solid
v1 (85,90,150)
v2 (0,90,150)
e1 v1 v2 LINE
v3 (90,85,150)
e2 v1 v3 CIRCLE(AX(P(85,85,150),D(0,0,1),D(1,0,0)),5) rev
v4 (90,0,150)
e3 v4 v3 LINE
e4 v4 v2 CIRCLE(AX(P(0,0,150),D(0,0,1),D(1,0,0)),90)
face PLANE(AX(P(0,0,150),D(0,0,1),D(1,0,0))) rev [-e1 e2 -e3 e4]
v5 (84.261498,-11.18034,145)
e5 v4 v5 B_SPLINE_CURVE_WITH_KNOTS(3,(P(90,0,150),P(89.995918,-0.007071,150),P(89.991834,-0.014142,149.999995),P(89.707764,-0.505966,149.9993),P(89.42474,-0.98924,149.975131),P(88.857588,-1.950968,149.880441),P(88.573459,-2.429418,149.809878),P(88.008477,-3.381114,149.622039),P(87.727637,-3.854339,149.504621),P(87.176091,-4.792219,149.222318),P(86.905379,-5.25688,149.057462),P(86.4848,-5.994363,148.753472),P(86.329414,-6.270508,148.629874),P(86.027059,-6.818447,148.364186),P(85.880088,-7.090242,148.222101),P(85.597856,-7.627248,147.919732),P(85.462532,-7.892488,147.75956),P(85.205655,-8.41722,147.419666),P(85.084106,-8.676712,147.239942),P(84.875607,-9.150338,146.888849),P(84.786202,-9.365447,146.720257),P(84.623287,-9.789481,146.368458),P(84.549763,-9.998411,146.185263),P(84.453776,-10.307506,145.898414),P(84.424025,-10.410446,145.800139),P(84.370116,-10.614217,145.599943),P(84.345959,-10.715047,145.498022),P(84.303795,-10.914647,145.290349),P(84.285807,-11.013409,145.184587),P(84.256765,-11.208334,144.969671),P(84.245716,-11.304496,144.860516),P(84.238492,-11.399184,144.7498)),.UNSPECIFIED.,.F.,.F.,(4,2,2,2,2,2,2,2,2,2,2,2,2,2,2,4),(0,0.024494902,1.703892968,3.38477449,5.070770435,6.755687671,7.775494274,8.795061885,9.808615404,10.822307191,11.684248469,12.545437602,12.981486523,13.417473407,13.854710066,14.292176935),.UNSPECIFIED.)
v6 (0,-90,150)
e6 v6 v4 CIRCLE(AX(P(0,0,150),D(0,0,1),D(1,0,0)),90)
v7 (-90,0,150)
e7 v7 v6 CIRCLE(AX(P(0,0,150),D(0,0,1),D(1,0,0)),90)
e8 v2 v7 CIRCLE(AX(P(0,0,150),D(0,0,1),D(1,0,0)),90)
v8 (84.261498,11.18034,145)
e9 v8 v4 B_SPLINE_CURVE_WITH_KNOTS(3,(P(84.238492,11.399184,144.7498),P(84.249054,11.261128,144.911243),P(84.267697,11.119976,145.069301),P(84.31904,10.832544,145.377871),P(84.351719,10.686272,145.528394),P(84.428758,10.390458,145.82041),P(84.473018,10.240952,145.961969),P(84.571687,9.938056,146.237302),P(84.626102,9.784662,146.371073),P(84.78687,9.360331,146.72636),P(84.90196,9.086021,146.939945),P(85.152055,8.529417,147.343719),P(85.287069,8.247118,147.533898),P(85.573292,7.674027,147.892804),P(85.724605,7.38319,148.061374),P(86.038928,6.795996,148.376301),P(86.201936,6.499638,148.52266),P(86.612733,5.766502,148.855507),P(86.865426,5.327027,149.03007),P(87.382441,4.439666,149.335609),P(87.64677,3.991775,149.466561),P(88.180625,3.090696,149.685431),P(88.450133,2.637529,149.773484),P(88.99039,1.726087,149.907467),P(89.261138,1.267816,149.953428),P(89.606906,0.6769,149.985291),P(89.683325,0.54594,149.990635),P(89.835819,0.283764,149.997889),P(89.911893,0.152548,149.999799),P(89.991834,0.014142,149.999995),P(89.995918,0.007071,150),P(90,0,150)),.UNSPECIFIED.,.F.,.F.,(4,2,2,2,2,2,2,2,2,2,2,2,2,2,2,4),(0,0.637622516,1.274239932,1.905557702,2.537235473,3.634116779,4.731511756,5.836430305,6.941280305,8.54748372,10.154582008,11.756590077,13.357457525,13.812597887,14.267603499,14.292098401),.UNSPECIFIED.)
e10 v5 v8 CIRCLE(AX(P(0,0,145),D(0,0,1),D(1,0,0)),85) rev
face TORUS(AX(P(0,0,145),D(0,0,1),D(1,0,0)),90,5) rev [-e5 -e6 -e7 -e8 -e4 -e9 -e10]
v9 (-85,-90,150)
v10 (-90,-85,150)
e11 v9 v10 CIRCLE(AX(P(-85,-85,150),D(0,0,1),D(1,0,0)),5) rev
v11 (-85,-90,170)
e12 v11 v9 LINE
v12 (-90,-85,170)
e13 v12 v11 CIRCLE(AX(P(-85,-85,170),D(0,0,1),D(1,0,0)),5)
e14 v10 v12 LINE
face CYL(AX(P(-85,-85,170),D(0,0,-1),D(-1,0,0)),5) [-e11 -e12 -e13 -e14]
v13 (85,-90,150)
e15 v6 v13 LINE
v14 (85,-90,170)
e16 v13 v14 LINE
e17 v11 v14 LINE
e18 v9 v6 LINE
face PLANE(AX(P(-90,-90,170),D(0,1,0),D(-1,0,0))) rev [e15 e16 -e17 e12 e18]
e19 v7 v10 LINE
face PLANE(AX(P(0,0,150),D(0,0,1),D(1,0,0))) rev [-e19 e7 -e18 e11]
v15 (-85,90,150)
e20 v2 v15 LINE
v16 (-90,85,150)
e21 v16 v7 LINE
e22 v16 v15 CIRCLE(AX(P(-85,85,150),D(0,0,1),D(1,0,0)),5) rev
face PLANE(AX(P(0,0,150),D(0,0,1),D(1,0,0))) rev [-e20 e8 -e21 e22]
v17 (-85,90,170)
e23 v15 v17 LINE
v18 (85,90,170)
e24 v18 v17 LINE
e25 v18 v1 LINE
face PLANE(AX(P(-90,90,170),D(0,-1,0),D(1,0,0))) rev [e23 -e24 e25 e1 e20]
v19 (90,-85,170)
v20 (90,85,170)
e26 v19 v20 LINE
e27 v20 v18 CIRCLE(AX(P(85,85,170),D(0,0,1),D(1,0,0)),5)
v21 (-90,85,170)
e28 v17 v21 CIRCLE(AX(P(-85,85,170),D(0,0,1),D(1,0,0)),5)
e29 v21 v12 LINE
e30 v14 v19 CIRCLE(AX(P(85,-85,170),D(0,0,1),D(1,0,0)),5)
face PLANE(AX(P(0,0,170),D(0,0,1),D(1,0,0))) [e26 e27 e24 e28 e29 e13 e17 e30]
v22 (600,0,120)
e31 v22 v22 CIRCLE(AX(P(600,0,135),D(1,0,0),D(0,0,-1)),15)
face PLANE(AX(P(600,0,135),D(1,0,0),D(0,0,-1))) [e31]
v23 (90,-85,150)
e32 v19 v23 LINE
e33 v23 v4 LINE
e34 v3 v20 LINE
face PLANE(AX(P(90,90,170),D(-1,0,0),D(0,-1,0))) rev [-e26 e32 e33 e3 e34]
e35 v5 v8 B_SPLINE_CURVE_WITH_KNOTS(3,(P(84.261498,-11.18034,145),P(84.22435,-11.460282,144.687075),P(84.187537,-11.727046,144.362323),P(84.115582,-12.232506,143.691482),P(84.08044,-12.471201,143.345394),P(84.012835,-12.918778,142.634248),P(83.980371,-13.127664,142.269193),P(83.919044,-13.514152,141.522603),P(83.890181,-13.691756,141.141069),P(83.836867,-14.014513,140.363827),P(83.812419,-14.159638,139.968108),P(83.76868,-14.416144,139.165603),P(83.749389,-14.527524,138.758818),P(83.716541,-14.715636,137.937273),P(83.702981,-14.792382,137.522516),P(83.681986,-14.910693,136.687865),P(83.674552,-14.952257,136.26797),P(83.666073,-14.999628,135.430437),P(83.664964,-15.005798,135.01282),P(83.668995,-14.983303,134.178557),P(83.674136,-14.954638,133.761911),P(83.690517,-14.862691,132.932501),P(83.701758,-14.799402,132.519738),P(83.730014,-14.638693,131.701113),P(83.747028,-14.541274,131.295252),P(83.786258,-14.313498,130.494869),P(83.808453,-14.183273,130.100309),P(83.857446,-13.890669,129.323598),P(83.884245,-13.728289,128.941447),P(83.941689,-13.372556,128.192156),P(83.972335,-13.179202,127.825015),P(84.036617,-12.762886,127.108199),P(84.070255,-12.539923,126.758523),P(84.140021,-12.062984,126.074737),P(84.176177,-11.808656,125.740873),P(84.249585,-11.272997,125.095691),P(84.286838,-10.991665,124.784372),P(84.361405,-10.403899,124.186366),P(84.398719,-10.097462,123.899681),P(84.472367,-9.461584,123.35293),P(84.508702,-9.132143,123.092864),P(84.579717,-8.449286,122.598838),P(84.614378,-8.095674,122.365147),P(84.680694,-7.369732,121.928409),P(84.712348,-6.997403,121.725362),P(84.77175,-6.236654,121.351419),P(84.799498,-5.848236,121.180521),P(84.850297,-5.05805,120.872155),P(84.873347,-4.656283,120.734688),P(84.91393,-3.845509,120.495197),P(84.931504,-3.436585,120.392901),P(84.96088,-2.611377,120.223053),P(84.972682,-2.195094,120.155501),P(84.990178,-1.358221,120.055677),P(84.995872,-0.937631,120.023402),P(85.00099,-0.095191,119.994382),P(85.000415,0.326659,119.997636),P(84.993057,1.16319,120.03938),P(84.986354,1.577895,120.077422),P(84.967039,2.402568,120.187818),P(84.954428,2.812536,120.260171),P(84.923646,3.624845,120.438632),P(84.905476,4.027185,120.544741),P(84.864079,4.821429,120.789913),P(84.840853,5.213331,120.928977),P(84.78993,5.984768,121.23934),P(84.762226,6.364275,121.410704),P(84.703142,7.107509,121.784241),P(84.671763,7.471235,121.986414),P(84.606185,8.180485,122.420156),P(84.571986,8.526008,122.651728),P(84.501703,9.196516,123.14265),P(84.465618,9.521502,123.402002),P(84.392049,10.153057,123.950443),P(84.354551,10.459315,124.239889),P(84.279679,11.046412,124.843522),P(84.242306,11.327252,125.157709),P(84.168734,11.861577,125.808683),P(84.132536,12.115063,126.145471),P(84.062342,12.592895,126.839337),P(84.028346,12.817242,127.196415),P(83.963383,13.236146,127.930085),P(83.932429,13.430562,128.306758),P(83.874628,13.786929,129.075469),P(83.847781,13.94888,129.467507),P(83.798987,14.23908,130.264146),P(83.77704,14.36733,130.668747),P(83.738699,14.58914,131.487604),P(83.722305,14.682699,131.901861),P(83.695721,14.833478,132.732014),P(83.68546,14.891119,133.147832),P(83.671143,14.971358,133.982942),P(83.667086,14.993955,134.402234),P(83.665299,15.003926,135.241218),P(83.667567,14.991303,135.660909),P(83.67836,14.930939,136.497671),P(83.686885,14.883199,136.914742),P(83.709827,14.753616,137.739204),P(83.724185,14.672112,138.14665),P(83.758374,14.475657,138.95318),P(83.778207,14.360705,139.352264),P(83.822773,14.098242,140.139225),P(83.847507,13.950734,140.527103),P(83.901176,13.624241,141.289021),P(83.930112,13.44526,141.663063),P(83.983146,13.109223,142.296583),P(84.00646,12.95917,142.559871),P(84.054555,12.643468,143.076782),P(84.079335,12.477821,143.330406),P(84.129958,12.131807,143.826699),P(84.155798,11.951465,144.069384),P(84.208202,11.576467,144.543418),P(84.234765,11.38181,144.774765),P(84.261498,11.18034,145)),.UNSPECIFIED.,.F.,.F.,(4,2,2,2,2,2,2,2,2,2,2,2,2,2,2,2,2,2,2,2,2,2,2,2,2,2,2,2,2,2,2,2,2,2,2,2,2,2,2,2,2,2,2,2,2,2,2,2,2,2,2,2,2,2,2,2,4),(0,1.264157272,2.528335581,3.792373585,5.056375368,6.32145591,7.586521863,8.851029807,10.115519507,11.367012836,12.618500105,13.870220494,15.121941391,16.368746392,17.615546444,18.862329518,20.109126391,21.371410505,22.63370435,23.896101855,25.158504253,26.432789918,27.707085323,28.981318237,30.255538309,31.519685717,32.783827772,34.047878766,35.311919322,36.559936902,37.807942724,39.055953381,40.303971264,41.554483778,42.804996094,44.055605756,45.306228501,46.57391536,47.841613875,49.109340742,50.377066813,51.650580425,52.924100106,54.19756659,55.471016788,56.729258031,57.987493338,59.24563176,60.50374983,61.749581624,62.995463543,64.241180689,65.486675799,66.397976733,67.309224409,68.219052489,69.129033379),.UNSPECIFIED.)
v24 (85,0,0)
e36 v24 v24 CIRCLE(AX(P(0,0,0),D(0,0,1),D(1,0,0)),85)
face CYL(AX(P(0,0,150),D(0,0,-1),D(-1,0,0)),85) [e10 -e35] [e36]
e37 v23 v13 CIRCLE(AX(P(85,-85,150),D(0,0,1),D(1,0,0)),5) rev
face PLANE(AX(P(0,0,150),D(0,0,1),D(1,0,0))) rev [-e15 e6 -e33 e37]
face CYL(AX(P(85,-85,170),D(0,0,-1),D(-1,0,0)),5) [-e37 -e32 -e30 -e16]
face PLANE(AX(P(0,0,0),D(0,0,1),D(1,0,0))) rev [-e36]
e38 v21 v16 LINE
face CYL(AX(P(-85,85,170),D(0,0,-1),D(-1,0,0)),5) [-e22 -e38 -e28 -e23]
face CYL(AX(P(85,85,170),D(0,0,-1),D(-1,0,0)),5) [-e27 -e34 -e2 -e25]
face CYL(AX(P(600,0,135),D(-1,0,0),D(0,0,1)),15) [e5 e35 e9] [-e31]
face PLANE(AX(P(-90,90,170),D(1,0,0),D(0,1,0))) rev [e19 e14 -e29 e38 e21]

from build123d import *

# Parameters (mm, degrees)
ESQUISSE1_R        = 85
BOSS_EXTRU_1_DEPTH = 150
ESQUISSE2_W        = 180
ESQUISSE2_H        = 180
BOSS_EXTRU_2_DEPTH = 20
CONG_1_R           = 5
CONG_2_R           = 5
CONG_3_R           = 5
CONG_4_R           = 5
CONG_5_R           = 5
ESQUISSE4_R        = 15
BOSS_EXTRU_3_DEPTH = 600


with BuildPart() as part:
    # Esquisse1 → Boss.-Extru.1 (new body)
    with BuildSketch(Plane.XY):
        Circle(ESQUISSE1_R)
    extrude(amount=BOSS_EXTRU_1_DEPTH)

    # Esquisse2 → Boss.-Extru.2 (add)
    with BuildSketch(Plane.XY.offset(150)):
        Rectangle(ESQUISSE2_W, ESQUISSE2_H)
    extrude(amount=BOSS_EXTRU_2_DEPTH)

    # Congé1
    cong_1_edges = [part.edges().sort_by_distance(p)[0] for p in [
        (-85, 0, 150),
    ]]
    fillet(cong_1_edges, radius=CONG_1_R - 0.0001)  # a hair under: the kernel refuses the full size

    # Congé2
    cong_2_edges = [part.edges().sort_by_distance(p)[0] for p in [
        (-90, 90, 160),
    ]]
    fillet(cong_2_edges, radius=CONG_2_R)

    # Congé3
    cong_3_edges = [part.edges().sort_by_distance(p)[0] for p in [
        (-90, -90, 160),
    ]]
    fillet(cong_3_edges, radius=CONG_3_R)

    # Congé4
    cong_4_edges = [part.edges().sort_by_distance(p)[0] for p in [
        (90, 90, 160),
    ]]
    fillet(cong_4_edges, radius=CONG_4_R)

    # Congé5
    cong_5_edges = [part.edges().sort_by_distance(p)[0] for p in [
        (90, -90, 160),
    ]]
    fillet(cong_5_edges, radius=CONG_5_R)

    # Esquisse4 → Boss.-Extru.3 (add)
    with BuildSketch(Plane(origin=(0, 0, 0), x_dir=(0, 0, -1), z_dir=(1, 0, 0))):
        with Locations(Location((-135, 0, 0), (0, 0, 180))):
            Circle(ESQUISSE4_R)
    extrude(amount=BOSS_EXTRU_3_DEPTH)


solid = part.part
